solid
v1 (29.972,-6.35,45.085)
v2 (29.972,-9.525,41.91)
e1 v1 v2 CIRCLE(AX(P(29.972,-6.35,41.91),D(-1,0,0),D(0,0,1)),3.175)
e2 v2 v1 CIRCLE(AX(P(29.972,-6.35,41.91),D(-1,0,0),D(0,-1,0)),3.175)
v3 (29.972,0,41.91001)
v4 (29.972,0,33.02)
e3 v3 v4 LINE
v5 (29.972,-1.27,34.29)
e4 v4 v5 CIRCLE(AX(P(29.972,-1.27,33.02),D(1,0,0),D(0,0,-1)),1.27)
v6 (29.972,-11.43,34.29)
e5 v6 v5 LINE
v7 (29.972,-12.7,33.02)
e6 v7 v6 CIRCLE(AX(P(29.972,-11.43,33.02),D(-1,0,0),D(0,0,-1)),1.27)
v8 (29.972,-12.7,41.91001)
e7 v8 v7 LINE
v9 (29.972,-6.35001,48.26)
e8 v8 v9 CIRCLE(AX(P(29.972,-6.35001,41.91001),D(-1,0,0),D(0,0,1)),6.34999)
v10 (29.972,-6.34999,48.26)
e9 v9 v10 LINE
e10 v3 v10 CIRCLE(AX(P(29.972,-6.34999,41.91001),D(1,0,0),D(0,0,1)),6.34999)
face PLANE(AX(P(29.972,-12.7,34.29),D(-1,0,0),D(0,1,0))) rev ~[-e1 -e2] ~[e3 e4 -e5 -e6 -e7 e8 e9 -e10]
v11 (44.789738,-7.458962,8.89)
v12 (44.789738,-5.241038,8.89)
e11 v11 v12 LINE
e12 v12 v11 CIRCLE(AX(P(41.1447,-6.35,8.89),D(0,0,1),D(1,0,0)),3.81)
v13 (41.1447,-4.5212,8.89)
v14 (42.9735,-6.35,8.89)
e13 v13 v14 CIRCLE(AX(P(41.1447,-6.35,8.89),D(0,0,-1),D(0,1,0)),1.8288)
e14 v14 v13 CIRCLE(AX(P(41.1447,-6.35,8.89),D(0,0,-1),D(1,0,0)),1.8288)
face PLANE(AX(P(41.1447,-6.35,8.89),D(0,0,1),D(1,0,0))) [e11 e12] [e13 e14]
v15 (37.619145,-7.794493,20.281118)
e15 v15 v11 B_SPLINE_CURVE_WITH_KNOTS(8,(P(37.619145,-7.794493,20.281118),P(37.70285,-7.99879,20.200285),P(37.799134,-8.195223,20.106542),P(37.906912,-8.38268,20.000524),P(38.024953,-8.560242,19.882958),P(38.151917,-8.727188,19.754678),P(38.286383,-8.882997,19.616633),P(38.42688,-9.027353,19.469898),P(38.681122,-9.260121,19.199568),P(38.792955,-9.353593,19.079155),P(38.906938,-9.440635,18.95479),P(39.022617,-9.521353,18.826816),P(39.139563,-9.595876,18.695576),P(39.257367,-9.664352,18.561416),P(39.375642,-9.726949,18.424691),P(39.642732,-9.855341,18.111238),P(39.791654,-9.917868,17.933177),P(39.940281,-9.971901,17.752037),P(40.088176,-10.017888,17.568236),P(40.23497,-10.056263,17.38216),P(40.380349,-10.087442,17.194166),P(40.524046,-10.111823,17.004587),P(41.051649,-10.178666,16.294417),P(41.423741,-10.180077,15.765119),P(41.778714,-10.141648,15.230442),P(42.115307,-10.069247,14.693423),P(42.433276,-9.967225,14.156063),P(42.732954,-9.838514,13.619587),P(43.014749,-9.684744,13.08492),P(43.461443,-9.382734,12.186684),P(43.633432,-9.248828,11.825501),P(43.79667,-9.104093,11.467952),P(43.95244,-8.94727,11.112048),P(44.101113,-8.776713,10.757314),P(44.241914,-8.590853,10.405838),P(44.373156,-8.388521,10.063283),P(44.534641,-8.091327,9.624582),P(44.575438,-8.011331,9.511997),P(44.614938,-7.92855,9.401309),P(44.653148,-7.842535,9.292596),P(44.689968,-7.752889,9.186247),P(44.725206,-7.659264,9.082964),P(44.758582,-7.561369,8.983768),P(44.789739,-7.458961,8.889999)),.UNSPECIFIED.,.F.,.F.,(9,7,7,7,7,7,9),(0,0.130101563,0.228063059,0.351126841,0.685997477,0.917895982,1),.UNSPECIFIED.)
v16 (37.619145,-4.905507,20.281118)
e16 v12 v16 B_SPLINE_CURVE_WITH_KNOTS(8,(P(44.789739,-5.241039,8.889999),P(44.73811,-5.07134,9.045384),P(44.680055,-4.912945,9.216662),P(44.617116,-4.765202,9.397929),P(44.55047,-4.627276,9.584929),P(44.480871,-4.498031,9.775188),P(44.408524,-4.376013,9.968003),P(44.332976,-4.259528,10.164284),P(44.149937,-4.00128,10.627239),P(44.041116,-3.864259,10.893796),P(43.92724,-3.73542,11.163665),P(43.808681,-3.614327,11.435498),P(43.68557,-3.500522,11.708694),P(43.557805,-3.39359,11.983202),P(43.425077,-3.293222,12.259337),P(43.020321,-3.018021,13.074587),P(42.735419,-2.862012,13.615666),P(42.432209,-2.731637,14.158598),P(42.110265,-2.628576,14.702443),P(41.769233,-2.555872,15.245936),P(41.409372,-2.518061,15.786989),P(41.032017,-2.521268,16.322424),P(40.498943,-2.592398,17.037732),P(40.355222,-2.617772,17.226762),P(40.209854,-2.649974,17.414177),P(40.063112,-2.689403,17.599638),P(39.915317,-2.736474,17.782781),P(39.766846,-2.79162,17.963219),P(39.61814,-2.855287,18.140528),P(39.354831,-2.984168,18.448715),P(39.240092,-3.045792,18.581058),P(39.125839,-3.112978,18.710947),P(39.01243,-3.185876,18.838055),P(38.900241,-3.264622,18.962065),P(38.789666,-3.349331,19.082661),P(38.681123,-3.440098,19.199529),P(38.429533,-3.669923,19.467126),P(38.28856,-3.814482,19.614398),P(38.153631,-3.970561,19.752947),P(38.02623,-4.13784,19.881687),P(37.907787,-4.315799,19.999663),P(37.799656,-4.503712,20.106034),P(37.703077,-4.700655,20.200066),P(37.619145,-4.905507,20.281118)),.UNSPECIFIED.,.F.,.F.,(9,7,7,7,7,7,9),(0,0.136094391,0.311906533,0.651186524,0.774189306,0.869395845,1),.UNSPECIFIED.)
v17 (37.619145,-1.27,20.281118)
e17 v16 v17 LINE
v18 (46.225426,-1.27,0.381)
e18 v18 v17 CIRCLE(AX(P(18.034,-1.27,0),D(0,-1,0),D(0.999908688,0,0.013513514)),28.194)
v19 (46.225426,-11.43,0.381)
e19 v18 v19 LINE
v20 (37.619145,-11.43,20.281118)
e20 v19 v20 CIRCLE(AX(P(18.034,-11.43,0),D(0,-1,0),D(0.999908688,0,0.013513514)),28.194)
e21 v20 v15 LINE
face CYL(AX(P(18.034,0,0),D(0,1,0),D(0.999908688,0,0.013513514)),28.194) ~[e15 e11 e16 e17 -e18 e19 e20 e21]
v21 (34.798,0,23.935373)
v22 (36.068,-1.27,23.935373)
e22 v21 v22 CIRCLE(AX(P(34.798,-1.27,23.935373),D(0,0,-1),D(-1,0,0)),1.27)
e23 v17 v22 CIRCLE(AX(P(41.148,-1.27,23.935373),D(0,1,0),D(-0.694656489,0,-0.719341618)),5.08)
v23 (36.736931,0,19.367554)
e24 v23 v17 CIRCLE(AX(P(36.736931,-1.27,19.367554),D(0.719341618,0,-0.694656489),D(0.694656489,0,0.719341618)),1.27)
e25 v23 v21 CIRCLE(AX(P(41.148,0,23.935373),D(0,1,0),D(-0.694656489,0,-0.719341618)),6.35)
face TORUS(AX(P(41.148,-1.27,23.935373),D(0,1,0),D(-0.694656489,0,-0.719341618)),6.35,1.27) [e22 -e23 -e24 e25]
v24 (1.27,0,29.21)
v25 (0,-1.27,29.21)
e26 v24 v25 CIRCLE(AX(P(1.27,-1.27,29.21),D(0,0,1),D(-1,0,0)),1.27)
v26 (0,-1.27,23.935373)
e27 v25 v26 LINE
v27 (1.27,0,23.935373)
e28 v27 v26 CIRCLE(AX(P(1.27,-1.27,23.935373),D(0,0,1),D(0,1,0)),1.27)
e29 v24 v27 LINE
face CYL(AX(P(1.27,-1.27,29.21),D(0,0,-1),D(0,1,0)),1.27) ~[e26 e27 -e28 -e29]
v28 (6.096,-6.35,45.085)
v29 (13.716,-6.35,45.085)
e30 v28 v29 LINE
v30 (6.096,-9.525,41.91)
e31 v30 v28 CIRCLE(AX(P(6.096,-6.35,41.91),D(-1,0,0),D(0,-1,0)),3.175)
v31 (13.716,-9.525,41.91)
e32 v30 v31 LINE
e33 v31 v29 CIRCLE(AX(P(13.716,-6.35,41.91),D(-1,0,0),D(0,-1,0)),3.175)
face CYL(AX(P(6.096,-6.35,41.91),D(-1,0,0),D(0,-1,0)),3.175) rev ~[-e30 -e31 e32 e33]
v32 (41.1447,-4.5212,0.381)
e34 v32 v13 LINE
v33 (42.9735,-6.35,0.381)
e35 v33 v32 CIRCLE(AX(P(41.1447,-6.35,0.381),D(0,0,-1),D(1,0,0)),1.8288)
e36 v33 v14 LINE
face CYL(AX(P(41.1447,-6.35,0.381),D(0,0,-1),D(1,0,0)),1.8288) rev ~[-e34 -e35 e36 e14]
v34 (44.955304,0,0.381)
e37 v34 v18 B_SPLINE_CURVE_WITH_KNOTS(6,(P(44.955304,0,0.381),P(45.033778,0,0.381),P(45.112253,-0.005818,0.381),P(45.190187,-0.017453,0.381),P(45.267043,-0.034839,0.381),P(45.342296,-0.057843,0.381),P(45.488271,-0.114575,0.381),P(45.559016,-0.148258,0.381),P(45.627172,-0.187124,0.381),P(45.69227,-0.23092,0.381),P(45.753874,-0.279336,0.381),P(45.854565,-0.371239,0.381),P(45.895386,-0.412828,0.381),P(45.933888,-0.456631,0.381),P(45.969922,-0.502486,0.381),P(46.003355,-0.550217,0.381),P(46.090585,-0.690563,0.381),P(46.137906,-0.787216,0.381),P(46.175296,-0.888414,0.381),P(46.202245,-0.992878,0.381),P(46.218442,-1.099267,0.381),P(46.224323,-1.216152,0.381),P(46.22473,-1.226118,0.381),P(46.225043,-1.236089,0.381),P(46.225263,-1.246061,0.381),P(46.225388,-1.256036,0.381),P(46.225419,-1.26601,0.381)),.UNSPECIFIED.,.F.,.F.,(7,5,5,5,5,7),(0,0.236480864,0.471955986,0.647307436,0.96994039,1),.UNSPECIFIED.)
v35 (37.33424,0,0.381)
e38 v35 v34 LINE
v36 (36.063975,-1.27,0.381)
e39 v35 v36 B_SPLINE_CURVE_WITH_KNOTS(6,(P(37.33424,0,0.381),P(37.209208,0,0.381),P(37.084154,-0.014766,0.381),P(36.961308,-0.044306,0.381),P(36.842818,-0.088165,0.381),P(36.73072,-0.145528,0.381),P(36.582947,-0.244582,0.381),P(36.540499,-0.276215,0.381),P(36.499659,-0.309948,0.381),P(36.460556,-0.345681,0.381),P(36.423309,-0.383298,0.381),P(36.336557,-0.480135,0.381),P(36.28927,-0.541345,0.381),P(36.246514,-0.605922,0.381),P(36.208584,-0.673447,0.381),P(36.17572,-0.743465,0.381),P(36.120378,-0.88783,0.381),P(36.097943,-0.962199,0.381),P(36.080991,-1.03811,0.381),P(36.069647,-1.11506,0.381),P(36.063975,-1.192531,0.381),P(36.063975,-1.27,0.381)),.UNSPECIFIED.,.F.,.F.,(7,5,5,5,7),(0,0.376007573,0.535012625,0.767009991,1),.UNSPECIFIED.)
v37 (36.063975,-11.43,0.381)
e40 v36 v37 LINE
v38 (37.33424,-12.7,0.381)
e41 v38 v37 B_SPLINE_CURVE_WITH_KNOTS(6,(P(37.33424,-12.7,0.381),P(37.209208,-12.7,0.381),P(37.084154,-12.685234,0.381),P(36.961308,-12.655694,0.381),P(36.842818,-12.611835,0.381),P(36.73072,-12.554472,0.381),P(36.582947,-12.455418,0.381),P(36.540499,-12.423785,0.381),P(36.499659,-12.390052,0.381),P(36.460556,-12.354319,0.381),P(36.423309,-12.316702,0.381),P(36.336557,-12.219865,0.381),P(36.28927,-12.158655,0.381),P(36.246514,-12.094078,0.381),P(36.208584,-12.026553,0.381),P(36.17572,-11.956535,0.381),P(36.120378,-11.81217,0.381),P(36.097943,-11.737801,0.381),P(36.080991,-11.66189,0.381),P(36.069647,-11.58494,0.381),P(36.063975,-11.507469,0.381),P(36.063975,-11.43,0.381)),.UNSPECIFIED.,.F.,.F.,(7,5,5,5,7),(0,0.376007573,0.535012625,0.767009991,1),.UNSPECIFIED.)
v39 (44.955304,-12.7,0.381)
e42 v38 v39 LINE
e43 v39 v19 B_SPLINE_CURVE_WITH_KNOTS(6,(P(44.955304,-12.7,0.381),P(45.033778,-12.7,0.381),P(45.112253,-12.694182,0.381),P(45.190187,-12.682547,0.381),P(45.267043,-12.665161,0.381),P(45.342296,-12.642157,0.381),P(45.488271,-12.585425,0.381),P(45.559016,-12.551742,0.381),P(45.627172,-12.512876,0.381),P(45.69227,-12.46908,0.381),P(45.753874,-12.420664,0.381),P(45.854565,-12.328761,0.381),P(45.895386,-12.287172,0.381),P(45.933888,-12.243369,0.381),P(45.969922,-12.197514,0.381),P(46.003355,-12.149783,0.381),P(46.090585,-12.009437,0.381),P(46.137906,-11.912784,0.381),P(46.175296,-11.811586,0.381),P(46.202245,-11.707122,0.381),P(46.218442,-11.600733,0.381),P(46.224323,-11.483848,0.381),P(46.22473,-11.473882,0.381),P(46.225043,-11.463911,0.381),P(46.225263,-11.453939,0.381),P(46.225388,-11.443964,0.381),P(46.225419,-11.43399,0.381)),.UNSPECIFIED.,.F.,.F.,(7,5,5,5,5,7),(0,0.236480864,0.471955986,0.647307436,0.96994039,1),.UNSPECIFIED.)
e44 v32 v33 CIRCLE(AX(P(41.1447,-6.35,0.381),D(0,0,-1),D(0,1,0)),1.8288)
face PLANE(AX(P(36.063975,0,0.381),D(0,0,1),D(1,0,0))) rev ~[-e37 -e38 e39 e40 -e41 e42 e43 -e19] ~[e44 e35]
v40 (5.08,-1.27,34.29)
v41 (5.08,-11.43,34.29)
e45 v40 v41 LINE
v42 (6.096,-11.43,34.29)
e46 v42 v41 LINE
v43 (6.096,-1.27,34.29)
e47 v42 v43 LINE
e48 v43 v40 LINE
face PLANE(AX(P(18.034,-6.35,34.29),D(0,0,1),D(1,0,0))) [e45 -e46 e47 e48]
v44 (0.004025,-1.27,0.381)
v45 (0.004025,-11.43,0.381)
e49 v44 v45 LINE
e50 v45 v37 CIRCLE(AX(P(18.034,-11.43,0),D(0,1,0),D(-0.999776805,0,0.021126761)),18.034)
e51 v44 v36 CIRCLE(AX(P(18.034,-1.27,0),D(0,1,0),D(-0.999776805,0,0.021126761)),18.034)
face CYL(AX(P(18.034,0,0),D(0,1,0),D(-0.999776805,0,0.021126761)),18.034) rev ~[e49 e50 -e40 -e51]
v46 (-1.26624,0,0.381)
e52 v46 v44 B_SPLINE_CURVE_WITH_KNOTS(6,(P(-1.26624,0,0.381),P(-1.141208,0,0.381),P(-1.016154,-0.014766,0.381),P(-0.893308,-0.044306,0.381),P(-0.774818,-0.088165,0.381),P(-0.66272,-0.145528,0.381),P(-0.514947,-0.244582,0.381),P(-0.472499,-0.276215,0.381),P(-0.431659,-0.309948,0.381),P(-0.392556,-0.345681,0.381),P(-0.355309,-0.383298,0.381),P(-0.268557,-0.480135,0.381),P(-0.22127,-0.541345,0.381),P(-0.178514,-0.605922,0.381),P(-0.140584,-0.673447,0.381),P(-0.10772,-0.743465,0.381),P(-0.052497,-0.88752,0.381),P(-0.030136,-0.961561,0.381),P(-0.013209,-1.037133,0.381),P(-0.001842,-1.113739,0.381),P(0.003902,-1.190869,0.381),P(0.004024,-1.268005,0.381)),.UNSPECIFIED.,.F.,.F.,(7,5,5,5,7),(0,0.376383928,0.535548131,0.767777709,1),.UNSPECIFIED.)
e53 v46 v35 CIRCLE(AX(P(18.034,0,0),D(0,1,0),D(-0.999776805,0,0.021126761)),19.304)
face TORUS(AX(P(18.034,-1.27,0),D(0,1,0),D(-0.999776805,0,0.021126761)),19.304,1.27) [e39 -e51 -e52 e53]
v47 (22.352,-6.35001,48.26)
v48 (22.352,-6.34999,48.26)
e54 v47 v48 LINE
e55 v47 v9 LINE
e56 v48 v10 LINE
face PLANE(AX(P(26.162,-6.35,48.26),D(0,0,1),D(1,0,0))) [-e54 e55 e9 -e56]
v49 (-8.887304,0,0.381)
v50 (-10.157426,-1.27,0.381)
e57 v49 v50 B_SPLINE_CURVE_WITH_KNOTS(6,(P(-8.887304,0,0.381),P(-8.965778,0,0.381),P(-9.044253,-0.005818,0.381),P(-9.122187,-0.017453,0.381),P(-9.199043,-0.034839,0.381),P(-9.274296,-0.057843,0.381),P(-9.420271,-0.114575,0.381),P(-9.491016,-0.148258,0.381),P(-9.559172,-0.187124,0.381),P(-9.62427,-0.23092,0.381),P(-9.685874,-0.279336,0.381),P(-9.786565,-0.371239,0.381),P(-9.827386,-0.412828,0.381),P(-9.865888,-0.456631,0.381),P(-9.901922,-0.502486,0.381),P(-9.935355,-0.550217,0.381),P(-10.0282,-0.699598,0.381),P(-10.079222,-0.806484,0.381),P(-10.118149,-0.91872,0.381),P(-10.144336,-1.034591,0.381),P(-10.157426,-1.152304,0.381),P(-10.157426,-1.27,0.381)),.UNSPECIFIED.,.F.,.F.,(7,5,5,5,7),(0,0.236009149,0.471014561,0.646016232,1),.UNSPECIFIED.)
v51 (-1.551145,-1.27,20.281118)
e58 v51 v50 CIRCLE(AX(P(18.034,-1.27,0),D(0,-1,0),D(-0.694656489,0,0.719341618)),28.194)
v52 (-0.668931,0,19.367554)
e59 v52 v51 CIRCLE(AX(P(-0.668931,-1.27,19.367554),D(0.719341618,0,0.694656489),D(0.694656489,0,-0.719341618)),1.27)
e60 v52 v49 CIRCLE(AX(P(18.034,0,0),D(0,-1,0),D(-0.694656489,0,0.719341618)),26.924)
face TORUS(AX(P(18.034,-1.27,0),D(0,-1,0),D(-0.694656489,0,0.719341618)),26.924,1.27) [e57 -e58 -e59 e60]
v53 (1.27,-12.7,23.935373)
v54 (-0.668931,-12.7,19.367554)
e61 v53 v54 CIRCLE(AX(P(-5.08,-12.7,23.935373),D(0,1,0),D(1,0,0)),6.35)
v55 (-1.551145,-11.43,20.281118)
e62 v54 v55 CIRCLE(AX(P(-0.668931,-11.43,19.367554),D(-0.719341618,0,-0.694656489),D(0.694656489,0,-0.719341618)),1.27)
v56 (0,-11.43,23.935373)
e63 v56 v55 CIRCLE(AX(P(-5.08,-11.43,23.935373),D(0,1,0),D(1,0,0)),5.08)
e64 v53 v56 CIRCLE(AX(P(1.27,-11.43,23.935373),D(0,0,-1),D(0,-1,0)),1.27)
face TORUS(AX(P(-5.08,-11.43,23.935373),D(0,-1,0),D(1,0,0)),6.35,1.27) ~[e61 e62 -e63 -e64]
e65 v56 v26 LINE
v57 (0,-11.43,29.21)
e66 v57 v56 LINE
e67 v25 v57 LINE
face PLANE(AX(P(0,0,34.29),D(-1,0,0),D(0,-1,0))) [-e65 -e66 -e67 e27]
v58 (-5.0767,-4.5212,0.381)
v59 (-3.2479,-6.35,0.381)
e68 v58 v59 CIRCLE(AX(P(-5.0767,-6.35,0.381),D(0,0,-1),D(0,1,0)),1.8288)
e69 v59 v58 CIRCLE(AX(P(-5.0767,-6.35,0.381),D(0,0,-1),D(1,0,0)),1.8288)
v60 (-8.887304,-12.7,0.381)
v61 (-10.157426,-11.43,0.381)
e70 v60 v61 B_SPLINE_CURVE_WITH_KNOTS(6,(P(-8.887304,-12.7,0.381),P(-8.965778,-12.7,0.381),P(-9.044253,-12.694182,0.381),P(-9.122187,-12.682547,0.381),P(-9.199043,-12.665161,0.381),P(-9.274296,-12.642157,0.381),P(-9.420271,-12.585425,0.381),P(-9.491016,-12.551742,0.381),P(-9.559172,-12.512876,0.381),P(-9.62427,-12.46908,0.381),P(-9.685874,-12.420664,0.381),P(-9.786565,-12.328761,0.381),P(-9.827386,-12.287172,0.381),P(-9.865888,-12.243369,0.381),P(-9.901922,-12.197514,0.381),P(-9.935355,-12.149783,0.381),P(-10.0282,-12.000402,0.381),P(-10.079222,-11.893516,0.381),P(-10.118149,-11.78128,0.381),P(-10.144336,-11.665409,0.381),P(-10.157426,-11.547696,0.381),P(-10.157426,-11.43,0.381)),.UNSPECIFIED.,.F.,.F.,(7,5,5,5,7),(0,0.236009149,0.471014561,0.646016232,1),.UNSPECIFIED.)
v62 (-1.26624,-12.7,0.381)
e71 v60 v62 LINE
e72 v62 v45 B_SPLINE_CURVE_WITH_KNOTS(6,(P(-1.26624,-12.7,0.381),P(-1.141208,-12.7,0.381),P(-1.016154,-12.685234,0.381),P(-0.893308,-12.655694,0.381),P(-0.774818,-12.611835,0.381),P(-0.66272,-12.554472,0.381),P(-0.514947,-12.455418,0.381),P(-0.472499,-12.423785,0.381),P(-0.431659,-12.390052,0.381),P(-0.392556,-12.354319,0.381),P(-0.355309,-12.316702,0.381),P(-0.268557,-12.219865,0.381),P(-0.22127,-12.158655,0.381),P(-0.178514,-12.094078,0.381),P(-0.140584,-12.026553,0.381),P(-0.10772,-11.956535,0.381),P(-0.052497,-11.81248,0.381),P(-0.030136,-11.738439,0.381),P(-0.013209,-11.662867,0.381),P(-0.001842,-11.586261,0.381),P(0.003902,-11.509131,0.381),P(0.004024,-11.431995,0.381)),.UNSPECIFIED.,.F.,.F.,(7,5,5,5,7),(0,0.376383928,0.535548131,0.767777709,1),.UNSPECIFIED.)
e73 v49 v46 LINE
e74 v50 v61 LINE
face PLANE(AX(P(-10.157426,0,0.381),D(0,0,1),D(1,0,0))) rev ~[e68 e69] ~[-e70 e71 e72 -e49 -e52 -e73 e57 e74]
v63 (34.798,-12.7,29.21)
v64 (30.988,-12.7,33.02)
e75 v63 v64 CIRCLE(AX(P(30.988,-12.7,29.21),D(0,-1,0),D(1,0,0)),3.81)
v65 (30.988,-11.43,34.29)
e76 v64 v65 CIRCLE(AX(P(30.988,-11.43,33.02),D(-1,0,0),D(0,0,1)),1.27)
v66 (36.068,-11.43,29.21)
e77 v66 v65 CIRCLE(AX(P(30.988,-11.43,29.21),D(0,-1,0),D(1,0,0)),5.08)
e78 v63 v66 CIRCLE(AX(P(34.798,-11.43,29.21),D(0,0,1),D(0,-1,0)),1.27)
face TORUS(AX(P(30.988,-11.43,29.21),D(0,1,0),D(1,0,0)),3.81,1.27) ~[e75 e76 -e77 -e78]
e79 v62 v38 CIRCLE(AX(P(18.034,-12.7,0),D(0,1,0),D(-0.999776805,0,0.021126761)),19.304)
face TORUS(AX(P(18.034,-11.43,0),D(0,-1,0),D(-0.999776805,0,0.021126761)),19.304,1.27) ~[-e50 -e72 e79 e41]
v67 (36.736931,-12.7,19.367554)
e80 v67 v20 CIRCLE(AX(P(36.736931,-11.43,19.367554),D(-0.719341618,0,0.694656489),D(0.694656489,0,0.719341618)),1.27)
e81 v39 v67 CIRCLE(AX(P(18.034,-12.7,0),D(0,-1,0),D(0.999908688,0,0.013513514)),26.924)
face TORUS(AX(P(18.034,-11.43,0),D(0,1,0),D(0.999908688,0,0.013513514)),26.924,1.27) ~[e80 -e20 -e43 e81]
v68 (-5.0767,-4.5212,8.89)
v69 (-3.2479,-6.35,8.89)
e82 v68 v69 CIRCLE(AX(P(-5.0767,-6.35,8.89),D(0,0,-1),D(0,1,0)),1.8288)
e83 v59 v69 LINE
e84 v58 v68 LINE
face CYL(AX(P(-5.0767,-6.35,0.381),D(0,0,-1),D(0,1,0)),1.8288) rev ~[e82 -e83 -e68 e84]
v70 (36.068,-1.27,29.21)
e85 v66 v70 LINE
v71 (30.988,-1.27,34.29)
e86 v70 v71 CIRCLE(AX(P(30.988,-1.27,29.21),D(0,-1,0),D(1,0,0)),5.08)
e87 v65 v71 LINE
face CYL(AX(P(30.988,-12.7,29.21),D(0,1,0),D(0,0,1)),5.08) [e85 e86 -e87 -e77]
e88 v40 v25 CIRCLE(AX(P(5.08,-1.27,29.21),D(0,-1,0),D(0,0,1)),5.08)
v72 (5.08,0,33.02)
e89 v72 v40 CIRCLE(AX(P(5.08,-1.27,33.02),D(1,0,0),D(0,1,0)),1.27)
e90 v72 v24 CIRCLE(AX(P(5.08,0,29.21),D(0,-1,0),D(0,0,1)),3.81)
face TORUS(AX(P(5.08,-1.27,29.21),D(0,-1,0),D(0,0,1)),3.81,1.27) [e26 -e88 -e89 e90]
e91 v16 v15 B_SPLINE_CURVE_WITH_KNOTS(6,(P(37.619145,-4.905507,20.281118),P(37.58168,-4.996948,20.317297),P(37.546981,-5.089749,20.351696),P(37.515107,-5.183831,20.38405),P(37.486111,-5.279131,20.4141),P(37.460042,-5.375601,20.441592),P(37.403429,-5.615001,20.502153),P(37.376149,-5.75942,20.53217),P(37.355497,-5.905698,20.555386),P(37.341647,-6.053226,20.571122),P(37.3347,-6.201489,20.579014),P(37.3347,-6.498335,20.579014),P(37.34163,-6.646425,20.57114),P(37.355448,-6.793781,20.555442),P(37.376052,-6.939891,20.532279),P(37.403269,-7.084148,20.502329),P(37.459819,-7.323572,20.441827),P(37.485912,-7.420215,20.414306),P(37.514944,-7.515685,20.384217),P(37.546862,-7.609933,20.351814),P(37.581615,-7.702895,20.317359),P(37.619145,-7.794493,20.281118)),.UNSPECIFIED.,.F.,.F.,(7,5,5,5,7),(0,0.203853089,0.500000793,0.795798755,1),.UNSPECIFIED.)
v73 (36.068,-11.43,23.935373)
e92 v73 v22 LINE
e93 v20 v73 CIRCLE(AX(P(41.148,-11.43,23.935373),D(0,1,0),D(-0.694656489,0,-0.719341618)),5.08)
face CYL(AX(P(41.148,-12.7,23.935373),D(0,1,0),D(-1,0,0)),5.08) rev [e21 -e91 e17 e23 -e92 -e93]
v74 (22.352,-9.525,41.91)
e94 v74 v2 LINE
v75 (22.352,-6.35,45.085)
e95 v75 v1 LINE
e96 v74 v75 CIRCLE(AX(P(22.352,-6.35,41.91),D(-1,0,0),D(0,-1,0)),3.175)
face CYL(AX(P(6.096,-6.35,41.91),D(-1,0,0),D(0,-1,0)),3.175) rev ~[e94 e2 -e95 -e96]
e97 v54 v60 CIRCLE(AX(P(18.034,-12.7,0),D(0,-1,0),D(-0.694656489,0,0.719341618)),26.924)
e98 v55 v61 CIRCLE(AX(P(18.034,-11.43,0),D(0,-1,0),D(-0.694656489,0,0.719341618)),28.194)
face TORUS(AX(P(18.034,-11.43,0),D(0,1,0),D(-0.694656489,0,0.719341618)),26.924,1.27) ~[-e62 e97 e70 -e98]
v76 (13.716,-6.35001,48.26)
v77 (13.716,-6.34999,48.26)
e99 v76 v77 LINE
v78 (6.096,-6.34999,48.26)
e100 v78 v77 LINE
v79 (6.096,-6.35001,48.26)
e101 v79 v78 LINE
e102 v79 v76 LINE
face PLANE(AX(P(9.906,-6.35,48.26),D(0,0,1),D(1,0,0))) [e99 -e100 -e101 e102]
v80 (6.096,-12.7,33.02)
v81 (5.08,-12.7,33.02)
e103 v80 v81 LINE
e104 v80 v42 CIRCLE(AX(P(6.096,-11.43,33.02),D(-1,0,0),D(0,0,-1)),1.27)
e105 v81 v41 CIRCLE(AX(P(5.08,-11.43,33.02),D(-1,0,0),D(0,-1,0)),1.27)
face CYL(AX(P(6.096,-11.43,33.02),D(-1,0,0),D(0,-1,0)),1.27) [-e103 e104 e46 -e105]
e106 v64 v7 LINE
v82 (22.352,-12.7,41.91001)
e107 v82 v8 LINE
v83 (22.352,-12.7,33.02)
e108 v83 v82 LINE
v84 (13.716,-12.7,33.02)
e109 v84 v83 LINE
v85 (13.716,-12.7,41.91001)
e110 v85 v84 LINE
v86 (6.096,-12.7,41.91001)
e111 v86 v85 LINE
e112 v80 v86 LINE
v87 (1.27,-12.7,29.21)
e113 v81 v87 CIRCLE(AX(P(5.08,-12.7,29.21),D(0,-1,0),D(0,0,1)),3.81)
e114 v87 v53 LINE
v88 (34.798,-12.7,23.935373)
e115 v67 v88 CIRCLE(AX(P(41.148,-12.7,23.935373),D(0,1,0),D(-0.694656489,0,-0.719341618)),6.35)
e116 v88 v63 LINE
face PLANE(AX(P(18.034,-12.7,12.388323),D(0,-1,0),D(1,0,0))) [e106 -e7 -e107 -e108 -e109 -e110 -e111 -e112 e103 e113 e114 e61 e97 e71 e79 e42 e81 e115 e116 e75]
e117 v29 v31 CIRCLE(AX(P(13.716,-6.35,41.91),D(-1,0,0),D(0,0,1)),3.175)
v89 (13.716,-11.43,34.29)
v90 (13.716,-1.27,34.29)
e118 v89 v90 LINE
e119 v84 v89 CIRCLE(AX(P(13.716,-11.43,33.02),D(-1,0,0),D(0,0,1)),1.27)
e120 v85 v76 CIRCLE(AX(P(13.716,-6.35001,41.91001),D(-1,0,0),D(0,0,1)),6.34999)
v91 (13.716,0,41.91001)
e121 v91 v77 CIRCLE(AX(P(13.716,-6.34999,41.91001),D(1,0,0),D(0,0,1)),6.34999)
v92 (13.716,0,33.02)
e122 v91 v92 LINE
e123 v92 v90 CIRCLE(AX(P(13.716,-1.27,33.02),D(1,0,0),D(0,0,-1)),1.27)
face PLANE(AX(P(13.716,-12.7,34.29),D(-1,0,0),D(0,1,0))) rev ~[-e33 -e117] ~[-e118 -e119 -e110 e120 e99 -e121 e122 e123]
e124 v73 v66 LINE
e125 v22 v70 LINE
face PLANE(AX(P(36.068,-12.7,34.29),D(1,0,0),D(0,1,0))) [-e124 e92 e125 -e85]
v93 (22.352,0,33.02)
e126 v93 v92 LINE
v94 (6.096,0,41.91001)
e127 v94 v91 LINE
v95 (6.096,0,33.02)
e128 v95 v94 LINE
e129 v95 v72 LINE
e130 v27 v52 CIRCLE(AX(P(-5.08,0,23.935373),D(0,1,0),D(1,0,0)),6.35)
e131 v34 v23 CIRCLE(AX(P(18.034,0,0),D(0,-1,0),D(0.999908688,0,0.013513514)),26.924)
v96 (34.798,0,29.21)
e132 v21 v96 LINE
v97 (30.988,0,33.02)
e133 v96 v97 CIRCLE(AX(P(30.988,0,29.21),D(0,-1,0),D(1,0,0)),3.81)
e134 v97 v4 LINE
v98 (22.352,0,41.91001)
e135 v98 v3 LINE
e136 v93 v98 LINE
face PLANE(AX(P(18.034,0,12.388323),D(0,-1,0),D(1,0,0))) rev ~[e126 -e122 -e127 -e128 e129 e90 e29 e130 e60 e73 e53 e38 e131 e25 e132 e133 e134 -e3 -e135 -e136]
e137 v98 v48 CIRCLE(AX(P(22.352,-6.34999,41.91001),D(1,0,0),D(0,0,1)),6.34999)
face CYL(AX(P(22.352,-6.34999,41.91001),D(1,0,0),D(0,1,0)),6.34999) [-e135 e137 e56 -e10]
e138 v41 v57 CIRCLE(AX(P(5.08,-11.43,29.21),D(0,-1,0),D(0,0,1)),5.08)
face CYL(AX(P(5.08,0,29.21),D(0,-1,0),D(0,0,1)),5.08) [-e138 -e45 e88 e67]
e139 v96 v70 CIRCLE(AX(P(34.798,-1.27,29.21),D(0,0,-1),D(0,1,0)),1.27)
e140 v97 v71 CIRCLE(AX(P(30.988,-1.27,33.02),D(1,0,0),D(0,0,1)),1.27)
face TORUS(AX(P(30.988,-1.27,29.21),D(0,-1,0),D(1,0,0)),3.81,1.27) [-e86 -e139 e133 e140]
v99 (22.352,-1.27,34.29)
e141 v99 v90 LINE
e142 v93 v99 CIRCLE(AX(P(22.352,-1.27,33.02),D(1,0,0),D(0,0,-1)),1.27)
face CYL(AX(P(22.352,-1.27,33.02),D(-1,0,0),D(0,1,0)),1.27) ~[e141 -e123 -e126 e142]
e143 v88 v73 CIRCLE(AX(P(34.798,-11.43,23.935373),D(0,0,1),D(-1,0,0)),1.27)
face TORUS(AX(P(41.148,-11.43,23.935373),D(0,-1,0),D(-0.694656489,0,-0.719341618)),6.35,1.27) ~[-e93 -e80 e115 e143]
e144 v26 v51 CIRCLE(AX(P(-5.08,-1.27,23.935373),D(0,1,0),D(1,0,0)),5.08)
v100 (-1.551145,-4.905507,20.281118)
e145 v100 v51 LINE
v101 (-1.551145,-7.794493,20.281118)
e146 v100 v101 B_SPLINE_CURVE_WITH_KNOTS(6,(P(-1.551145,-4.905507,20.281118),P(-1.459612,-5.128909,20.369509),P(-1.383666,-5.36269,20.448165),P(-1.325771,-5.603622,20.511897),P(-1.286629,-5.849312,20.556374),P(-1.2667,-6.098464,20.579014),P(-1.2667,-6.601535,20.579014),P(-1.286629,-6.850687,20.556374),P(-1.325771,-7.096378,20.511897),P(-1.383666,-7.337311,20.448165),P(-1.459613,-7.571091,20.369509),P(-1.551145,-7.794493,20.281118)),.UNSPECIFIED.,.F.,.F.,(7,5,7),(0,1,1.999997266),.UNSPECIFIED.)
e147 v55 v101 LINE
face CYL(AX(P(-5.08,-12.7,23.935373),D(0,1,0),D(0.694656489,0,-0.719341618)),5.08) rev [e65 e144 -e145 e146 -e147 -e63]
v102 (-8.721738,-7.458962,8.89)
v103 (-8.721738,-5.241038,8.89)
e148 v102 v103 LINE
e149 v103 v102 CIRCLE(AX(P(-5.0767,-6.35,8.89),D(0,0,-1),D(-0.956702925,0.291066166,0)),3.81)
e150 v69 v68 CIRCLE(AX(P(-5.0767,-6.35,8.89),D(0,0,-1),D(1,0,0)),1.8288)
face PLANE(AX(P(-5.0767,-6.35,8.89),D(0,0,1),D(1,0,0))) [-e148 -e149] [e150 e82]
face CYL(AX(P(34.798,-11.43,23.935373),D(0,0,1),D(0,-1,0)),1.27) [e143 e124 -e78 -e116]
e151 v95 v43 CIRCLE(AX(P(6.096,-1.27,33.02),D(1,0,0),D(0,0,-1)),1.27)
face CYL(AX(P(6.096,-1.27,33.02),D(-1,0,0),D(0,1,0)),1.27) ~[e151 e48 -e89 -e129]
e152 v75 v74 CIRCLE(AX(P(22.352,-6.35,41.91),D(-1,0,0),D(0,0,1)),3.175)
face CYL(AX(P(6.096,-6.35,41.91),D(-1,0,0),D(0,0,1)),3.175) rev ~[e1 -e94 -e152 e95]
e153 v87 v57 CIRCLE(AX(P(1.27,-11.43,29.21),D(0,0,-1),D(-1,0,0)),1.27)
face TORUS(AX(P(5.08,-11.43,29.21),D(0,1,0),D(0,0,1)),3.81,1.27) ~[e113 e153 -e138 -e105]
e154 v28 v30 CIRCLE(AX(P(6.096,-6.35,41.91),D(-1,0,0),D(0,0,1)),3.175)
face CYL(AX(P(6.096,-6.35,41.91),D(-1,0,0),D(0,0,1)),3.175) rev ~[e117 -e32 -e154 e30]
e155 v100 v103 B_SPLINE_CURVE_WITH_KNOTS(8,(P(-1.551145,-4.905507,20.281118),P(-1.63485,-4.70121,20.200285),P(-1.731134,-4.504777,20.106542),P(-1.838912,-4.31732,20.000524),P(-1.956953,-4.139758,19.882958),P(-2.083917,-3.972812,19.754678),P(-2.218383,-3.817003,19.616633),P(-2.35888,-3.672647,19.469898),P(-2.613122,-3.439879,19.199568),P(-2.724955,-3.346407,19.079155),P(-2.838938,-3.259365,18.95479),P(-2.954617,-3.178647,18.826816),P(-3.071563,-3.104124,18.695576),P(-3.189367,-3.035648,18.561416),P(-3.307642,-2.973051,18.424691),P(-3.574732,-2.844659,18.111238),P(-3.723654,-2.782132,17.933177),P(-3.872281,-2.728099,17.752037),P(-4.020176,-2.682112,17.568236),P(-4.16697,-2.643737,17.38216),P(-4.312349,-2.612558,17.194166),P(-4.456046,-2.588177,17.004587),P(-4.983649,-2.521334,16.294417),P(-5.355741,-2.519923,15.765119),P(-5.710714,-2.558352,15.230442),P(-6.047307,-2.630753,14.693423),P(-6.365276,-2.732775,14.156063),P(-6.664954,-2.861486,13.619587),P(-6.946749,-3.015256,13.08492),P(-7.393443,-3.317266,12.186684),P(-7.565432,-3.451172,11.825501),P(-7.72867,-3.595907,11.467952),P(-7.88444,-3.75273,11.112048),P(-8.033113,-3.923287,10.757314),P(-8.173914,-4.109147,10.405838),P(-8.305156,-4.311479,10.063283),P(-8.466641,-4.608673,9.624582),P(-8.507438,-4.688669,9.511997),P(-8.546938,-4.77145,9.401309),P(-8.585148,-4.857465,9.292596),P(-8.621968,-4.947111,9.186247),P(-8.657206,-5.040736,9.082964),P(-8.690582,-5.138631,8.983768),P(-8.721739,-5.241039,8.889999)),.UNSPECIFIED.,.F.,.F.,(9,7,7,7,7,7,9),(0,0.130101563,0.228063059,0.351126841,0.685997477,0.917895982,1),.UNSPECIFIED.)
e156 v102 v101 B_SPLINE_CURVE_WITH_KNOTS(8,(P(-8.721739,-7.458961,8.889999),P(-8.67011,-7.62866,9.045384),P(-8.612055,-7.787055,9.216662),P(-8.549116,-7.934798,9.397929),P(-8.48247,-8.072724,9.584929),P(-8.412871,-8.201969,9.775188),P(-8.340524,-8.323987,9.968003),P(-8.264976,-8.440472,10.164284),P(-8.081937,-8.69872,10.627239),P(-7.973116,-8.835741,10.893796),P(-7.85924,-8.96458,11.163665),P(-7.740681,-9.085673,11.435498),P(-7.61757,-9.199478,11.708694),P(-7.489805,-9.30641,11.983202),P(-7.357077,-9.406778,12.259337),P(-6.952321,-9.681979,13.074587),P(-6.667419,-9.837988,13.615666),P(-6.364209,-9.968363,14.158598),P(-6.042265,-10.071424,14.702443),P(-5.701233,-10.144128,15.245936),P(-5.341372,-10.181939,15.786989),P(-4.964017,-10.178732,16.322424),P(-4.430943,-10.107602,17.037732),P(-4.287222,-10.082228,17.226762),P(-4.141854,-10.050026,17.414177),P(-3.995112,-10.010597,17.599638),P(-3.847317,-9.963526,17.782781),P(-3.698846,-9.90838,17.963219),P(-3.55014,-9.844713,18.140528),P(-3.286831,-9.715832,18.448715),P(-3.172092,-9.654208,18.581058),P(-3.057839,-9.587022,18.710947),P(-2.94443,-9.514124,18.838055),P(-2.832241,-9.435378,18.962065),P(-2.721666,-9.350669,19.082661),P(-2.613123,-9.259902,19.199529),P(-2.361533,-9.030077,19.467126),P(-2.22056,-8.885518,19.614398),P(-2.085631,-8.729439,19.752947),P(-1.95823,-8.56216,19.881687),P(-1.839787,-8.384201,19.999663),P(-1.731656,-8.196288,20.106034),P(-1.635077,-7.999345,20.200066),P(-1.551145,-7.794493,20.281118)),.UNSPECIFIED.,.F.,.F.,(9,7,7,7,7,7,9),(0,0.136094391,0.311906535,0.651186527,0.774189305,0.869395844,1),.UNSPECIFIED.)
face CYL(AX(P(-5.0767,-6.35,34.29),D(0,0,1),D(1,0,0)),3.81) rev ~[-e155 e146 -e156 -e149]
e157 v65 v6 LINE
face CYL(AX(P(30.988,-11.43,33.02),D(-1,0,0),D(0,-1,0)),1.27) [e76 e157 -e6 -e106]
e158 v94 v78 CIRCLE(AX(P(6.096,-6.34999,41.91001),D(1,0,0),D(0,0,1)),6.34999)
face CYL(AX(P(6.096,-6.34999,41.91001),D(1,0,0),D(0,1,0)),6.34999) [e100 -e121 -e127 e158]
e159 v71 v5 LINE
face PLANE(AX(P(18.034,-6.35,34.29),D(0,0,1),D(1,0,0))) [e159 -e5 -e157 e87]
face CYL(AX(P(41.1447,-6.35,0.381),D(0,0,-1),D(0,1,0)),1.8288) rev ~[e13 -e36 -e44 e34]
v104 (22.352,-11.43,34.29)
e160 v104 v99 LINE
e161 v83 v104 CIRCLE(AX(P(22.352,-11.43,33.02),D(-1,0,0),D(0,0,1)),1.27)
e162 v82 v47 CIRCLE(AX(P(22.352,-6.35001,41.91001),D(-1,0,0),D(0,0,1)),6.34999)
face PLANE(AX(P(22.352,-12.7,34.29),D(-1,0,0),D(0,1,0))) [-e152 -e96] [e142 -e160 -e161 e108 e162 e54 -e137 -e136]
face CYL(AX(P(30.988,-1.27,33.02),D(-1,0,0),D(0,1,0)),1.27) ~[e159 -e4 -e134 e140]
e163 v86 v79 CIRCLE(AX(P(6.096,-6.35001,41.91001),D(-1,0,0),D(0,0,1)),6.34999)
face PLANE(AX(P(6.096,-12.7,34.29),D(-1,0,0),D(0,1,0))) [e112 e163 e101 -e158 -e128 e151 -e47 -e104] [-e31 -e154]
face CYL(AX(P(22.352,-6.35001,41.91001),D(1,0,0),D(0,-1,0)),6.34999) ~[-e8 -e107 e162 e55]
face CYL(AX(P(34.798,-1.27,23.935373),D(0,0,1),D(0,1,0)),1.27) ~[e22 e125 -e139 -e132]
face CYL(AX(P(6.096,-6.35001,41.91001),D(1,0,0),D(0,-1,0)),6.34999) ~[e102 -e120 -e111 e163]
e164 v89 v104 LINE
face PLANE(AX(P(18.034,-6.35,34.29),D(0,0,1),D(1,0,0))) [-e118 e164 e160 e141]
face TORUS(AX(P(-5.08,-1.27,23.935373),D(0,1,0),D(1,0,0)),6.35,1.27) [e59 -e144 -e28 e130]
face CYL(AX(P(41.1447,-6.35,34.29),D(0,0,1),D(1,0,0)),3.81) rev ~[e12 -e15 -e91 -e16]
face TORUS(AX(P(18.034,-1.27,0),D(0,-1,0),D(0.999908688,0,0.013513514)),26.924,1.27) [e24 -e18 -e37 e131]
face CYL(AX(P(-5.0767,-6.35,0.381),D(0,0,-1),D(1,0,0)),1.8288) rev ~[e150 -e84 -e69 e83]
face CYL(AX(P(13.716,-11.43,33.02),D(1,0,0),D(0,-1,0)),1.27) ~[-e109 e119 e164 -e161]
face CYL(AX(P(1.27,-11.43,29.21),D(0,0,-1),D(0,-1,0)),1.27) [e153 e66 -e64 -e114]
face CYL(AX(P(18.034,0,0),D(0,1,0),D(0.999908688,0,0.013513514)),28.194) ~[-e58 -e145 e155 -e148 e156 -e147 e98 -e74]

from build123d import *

# Parameters (mm, degrees)
F1_DEPTH  = 12.7
F5_W      = 7.62
F5_H      = 12.7
F6_DEPTH  = 13.97
F8_DEPTH  = 23.876
F9_R      = 6.34999
F10_R     = 5.08
F12_REACH = 53.0526275257
F14_REACH = 53.0526275257
F15_R     = 3.81
F16_DEPTH = 25.4
F17_R     = 1.27


# Not quite as in the source:
# - a fillet or chamfer is up to 0.001 mm smaller than in the source, because OpenCascade refuses the exact size


with BuildPart() as f1:
    # F0 (on Front) → F1 (new body)
    with BuildSketch(Plane.XZ):
        with BuildLine():
            Line((-10.1574255581, 0.381), (0.0040250971, 0.381))
            ThreePointArc((0.0040250971, 0.381), (18.034, 18.034), (36.0639749029, 0.381))
            Line((36.0639749029, 0.381), (46.2254255581, 0.381))
            ThreePointArc((46.2254255581, 0.381), (18.034, 28.194), (-10.1574255581, 0.381))
        make_face()
    extrude(amount=F1_DEPTH)

    # F3 (on offset) → F4 (join, up to the next surface of F1)
    with BuildSketch(Plane.XY.offset(34.29)):
        Polygon((18.034, 0), (0, 0), (0, -12.7), (36.068, -12.7), (36.068, 0), align=None)
    extrude(until=Until.NEXT, dir=(0, 0, -1))

    # F5 (on face) → F6 (join)
    with BuildSketch(Plane.XY.offset(34.29)):
        with Locations((9.906, -6.35)):
            Rectangle(F5_W, F5_H)
        with Locations((26.162, -6.35)):
            Rectangle(F5_W, F5_H)
    extrude(amount=F6_DEPTH)

    # F7 (on face) → F8 (cut, through all)
    with BuildSketch(Plane(origin=(6.096, 0, 0), x_dir=(0, -1, 0), z_dir=(-1, 0, 0))):
        with BuildLine():
            ThreePointArc((6.35, 45.085), (4.1049359697, 39.6649359697), (9.525, 41.91))
            ThreePointArc((9.525, 41.91), (8.5950640303, 44.1550640303), (6.35, 45.085))
        make_face()
    extrude(amount=-F8_DEPTH, mode=Mode.SUBTRACT)

    # F9 (radius 6.35 in the source; OpenCascade refuses exactly that, so slightly less here)
    f9_edges = [f1.edges().sort_by_distance(p)[0] for p in [
        (9.906, -12.7, 48.26),
        (26.162, -12.7, 48.26),
        (9.906, 0, 48.26),
        (26.162, 0, 48.26),
    ]]
    fillet(f9_edges, radius=F9_R)

    # F10
    f10_edges = [f1.edges().sort_by_distance(p)[0] for p in [
        (36.068, -6.35, 34.29),
        (36.068, -6.35, 21.672021),
        (0, -6.35, 34.29),
        (0, -6.35, 21.672021),
    ]]
    fillet(f10_edges, radius=F10_R)

    f12_end = f1.faces().sort_by_distance((-7.8436707665, -6.35, 11.1914159829))[0]
    # F11 (on face) → F12 (cut, up to a face of the model that its end follows)
    with BuildSketch(Plane(origin=(0, 0, 0.381), x_dir=(1, 0, 0), z_dir=(0, 0, -1))):
        with BuildLine():
            ThreePointArc((-3.2479002305, 6.35), (-6.369857112, 7.6431568814), (-5.0767002305, 4.5212))
            ThreePointArc((-5.0767002305, 4.5212), (-3.7835433491, 5.0568431186), (-3.2479002305, 6.35))
        make_face()
    f12_long = extrude(amount=-F12_REACH, mode=Mode.PRIVATE)
    add(split(f12_long, bisect_by=f12_end, keep=Keep.BOTTOM, mode=Mode.PRIVATE), mode=Mode.SUBTRACT)

    f14_end = f1.faces().sort_by_distance((43.9116707665, -6.35, 11.1914159829))[0]
    # F13 (on face) → F14 (cut, up to a face of the model that its end follows)
    with BuildSketch(Plane(origin=(0, 0, 0.381), x_dir=(1, 0, 0), z_dir=(0, 0, -1))):
        with BuildLine():
            ThreePointArc((42.9735002305, 6.35), (39.8515433491, 7.6431568814), (41.1447002305, 4.5212))
            ThreePointArc((41.1447002305, 4.5212), (42.437857112, 5.0568431186), (42.9735002305, 6.35))
        make_face()
    f14_long = extrude(amount=-F14_REACH, mode=Mode.PRIVATE)
    add(split(f14_long, bisect_by=f14_end, keep=Keep.BOTTOM, mode=Mode.PRIVATE), mode=Mode.SUBTRACT)

    # F15 (on face) → F16 (cut)
    with BuildSketch(Plane.XY.offset(34.29)):
        with Locations((-5.0767002305, -6.35)):
            Circle(F15_R)
        with Locations((41.1447002305, -6.35)):
            Circle(F15_R)
    extrude(amount=-F16_DEPTH, mode=Mode.SUBTRACT)

    # F17
    f17_edges = [f1.edges().sort_by_distance(p)[0] for p in [
        (18.034, 0, 18.034),
        (-7.843671, 0, 11.191416),
        (-7.843671, -12.7, 11.191416),
        (43.911671, -12.7, 11.191416),
        (18.034, -12.7, 18.034),
        (43.911671, 0, 11.191416),
        (18.034, -12.7, 34.29),
        (18.034, 0, 34.29),
    ]]
    fillet(f17_edges, radius=F17_R)


solid = f1.part
